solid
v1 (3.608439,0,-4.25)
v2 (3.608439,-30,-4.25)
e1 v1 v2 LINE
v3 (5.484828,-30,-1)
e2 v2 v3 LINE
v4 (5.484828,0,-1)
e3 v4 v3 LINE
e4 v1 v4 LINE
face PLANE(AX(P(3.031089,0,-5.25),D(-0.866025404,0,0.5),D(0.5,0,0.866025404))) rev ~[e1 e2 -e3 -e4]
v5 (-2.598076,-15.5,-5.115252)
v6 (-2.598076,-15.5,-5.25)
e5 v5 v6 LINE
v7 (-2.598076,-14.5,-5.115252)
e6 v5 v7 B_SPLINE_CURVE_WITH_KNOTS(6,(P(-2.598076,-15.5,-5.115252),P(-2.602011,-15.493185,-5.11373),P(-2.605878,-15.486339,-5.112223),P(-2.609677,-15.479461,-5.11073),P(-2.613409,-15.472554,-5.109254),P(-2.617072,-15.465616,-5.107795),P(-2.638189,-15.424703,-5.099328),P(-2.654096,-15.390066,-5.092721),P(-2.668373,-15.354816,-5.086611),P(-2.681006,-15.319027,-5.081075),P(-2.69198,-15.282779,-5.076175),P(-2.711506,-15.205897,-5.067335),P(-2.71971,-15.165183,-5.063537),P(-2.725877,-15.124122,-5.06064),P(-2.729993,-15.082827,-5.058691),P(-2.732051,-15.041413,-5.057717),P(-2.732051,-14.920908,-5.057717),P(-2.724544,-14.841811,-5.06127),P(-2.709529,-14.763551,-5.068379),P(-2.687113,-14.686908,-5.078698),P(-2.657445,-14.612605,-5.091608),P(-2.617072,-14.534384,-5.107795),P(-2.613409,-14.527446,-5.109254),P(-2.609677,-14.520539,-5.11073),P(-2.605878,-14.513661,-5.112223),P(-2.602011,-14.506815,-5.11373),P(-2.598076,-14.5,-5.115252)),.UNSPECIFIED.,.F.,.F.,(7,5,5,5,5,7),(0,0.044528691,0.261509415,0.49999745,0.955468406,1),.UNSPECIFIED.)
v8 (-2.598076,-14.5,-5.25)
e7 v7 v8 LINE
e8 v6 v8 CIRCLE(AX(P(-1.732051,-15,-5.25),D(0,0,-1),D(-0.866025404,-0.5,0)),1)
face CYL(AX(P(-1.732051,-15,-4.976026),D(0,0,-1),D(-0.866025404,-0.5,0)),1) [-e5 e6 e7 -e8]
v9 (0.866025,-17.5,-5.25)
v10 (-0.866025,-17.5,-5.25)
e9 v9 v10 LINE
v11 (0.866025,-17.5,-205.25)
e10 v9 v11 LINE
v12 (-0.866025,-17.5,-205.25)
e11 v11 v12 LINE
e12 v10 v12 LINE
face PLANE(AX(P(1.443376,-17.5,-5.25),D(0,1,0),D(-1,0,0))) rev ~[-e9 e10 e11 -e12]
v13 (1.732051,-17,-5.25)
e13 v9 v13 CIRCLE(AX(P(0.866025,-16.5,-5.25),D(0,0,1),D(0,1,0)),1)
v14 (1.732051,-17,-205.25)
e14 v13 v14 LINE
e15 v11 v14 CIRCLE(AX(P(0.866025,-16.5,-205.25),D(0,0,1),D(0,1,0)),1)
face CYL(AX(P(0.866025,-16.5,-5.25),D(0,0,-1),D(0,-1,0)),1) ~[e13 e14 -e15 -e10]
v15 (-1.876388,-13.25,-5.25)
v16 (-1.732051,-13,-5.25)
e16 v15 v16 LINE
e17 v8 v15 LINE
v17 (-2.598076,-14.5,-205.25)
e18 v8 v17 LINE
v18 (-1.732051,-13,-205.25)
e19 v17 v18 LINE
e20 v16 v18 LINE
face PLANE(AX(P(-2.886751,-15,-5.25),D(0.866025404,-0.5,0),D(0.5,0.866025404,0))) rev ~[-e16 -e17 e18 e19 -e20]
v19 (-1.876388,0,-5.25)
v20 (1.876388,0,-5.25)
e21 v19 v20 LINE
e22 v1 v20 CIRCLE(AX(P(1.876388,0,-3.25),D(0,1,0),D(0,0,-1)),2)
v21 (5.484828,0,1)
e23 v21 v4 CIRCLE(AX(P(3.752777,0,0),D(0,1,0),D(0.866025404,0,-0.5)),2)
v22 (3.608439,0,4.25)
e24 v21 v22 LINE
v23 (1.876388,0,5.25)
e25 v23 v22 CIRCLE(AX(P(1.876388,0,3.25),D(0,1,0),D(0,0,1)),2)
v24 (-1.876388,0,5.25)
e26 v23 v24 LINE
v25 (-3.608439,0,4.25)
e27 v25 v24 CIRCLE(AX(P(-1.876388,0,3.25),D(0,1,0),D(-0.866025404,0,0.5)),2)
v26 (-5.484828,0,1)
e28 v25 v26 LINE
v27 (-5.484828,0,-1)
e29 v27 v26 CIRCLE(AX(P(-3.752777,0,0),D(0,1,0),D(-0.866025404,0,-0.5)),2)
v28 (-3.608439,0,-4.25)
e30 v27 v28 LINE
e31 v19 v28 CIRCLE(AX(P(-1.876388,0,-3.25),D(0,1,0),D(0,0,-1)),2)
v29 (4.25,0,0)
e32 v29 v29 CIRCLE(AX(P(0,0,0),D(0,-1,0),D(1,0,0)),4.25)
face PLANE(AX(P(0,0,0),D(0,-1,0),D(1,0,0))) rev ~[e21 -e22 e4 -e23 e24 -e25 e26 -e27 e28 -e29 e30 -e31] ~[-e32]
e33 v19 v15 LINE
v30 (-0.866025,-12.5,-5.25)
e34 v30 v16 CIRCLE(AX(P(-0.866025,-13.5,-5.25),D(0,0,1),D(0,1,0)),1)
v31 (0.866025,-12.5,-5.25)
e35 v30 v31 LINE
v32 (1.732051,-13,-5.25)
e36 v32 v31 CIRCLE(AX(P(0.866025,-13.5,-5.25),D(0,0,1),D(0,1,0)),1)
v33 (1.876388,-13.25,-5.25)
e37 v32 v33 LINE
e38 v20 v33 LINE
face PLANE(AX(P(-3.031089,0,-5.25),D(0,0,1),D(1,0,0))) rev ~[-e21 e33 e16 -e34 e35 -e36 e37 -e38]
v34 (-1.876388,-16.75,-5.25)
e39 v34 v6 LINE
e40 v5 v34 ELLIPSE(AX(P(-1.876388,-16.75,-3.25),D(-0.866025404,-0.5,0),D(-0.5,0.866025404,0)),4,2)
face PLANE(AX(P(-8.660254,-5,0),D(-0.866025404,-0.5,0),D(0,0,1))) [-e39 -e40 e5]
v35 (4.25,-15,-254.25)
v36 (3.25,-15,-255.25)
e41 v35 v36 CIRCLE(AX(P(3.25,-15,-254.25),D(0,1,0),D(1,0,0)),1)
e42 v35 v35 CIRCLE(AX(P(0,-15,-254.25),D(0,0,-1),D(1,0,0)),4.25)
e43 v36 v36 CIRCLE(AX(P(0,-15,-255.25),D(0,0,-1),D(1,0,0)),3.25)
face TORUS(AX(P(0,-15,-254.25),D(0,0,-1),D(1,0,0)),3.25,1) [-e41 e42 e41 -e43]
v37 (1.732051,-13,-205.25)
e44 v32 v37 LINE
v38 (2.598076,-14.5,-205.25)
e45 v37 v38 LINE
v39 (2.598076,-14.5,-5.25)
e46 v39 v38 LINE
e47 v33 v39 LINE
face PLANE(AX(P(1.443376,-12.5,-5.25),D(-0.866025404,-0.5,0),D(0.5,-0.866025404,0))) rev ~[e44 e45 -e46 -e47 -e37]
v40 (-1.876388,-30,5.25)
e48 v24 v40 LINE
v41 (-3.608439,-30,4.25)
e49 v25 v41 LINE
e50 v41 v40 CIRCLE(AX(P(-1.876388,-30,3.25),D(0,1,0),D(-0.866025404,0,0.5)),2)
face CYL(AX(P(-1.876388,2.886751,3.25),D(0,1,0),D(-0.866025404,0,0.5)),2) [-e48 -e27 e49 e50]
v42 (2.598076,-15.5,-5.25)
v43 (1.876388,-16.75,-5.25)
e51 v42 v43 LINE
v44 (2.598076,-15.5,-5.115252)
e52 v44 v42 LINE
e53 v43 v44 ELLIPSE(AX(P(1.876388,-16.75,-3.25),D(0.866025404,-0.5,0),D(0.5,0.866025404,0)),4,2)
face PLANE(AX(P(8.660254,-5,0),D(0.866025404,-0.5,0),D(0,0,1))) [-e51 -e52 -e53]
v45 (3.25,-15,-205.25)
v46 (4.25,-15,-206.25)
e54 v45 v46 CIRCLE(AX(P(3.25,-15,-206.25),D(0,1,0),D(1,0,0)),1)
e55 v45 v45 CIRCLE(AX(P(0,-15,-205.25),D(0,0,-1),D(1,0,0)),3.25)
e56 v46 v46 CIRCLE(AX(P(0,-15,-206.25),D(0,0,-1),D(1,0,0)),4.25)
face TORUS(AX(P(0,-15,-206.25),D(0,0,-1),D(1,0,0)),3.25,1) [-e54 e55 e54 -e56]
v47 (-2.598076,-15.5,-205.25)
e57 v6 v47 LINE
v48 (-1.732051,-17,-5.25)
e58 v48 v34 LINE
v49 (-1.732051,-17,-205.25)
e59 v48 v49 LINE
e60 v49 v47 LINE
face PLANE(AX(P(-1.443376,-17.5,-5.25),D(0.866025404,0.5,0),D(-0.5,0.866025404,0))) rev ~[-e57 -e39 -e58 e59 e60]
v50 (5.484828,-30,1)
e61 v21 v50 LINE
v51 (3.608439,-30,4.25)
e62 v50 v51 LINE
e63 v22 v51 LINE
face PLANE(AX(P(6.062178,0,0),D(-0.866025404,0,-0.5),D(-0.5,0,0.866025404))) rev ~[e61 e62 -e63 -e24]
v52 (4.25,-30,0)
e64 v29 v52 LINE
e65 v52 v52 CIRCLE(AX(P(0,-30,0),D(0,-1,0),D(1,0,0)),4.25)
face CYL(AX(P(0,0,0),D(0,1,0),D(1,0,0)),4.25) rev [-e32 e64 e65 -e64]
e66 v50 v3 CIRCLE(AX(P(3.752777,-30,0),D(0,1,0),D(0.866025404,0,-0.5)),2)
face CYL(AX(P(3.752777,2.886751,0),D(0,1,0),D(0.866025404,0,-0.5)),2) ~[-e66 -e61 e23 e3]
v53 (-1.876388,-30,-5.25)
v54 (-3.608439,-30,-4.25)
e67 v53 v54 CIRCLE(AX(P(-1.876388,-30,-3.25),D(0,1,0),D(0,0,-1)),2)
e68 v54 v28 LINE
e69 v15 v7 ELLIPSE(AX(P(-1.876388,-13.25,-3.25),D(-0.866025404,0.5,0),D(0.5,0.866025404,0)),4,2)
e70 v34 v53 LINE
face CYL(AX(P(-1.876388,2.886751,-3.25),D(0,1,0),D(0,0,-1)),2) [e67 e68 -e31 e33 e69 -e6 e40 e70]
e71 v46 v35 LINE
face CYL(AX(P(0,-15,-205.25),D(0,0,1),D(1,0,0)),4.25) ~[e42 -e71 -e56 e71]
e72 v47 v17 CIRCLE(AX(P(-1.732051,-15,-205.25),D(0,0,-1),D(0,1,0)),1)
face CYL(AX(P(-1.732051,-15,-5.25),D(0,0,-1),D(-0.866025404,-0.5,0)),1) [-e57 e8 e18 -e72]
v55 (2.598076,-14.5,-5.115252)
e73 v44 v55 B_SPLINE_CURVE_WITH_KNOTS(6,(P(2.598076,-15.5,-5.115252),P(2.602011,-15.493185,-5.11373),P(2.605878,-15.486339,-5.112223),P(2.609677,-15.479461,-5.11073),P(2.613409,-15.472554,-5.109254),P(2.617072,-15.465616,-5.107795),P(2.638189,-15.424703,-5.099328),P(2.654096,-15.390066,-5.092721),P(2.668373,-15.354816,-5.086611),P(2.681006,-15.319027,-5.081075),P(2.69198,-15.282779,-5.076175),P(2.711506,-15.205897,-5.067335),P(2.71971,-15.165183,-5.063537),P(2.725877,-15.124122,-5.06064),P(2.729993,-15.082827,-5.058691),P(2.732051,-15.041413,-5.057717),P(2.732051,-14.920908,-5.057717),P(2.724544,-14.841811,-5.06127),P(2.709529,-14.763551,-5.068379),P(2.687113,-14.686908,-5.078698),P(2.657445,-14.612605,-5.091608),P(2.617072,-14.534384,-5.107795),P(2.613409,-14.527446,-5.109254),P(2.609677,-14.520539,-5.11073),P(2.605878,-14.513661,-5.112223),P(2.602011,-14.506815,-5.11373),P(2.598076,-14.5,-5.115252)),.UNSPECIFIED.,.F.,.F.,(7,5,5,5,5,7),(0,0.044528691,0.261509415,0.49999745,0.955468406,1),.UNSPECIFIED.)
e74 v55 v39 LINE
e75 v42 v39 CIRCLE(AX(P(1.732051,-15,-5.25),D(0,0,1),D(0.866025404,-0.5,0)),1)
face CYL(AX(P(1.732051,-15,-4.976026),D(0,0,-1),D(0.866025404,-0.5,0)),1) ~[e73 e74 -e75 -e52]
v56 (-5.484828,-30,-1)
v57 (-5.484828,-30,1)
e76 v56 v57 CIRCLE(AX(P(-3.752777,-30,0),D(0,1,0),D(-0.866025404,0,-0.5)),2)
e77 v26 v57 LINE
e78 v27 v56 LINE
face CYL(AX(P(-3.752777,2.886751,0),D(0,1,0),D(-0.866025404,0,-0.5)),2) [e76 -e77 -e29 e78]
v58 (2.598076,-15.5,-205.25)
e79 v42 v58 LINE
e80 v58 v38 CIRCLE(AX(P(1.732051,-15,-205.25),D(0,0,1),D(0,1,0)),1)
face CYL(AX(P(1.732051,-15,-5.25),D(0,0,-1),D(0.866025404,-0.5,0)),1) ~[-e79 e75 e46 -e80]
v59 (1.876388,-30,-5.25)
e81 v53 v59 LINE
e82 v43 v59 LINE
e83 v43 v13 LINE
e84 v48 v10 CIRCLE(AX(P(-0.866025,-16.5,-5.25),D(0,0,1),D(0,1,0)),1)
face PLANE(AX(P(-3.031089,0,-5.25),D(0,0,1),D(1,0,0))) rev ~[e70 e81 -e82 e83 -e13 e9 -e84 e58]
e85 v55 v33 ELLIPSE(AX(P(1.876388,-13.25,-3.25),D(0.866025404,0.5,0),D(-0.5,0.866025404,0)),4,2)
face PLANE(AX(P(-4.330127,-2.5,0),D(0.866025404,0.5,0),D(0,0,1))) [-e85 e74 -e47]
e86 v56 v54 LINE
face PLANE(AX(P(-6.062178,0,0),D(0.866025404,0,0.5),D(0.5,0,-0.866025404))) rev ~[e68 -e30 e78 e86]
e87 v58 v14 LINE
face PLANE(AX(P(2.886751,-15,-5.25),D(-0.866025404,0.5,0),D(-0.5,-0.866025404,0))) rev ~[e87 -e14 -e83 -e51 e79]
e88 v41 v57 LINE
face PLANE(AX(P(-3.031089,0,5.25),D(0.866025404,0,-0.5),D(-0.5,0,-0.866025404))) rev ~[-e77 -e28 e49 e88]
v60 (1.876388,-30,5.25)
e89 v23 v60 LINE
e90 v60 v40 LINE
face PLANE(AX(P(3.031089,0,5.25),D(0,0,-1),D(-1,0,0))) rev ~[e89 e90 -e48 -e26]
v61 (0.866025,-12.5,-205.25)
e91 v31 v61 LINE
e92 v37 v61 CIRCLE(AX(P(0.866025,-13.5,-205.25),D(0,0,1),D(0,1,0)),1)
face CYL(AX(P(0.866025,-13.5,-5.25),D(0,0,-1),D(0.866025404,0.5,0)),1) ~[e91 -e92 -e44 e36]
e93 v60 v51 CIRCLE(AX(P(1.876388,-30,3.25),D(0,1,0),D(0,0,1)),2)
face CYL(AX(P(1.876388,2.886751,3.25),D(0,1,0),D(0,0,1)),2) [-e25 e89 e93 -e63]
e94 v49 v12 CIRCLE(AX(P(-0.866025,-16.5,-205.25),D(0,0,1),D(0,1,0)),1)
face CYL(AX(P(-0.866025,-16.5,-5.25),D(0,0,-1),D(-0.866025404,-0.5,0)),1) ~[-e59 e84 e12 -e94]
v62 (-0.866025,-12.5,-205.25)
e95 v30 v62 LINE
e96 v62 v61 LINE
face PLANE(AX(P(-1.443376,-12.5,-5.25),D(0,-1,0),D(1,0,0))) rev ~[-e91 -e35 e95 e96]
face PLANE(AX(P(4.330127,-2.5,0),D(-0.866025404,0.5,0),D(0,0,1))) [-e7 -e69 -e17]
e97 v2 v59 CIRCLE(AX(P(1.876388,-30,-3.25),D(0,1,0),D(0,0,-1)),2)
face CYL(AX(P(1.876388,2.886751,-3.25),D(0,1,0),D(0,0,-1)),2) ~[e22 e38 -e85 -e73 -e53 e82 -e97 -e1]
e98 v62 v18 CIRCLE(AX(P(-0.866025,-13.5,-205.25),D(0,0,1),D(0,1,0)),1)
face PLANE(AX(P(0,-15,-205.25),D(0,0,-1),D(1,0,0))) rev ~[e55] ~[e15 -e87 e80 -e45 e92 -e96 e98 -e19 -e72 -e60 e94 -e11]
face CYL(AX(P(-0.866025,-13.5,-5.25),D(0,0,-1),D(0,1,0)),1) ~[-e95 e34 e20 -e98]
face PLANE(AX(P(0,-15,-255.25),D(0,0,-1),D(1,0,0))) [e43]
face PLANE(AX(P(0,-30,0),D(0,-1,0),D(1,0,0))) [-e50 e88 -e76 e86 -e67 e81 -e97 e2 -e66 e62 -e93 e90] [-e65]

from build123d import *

# Parameters (mm, degrees)
F0_R         = 4.25
F1_DEPTH     = 30
F3_DEPTH     = 200
F4_R         = 4.25
F5_DEPTH     = 50
F6_T1_DEPTH  = 35.7735026919
F6_T6_DEPTH  = 35.7735026919
F6_T12_DEPTH = 35.7735026919
F6_T18_DEPTH = 35.7735026919
F6_T24_DEPTH = 35.7735026919
F6_T30_DEPTH = 35.7735026919
F6_T36_DEPTH = 35.7735026919
F7_R         = 1
F8_R         = 1


# Not quite as in the source:
# - a fillet or chamfer that OpenCascade refuses, or shapes differently, is made with other operations: its cross-section is extruded or revolved along the edge and cut away or added


with BuildPart() as f1:
    # F0 (on Front) → F1 (new body)
    with BuildSketch(Plane.XZ):
        Polygon((3.0310889132, 5.25), (-3.0310889132, 5.25), (-6.0621778265, 0), (-3.0310889132, -5.25), (3.0310889132, -5.25), (6.0621778265, 0), align=None)
        Circle(F0_R, mode=Mode.SUBTRACT)
    extrude(amount=F1_DEPTH)

    # F2 (on face) → F3 (join)
    with BuildSketch(Plane(origin=(0, 0, -5.25), x_dir=(1, 0, 0), z_dir=(0, 0, -1))):
        Polygon((-1.443375673, 12.5), (0, 12.5), (1.443375673, 12.5), (2.8867513459, 15), (1.443375673, 17.5), (-1.443375673, 17.5), (-2.8867513459, 15), align=None)
    extrude(amount=F3_DEPTH)

    # F4 (on face) → F5 (join)
    with BuildSketch(Plane(origin=(0, 0, -205.25), x_dir=(1, 0, 0), z_dir=(0, 0, -1))):
        with Locations((0, 15)):
            Circle(F4_R)
        Polygon((-1.443375673, 12.5), (-2.8867513459, 15), (-1.443375673, 17.5), (1.443375673, 17.5), (2.8867513459, 15), (1.443375673, 12.5), align=None, mode=Mode.SUBTRACT)
        Polygon((-1.443375673, 17.5), (-2.8867513459, 15), (-1.443375673, 12.5), (1.443375673, 12.5), (2.8867513459, 15), (1.443375673, 17.5), align=None)
    extrude(amount=F5_DEPTH)

    # F6: fillet of radius 2 on 6 edges, made by hand

    # F6_s2 → F6_t1 (cut)
    with BuildSketch(Plane.XZ.offset(-2.8867513459)):
        with BuildLine():
            ThreePointArc((5.4848275573, -1), (5.7527767497, 0), (5.4848275573, 1))
            Line((5.4848275573, 1), (6.0621778265, 0))
            Line((6.0621778265, 0), (5.4848275573, -1))
        make_face()
        with BuildLine():
            ThreePointArc((1.8763883749, 5.25), (2.8763883749, 4.9820508076), (3.6084391824, 4.25))
            Line((3.6084391824, 4.25), (3.0310889132, 5.25))
            Line((3.0310889132, 5.25), (1.8763883749, 5.25))
        make_face()
        with BuildLine():
            ThreePointArc((-3.6084391824, 4.25), (-2.8763883749, 4.9820508076), (-1.8763883749, 5.25))
            Line((-1.8763883749, 5.25), (-3.0310889132, 5.25))
            Line((-3.0310889132, 5.25), (-3.6084391824, 4.25))
        make_face()
        with BuildLine():
            ThreePointArc((-5.4848275573, -1), (-5.7527767497, 0), (-5.4848275573, 1))
            Line((-5.4848275573, 1), (-6.0621778265, 0))
            Line((-6.0621778265, 0), (-5.4848275573, -1))
        make_face()
    extrude(amount=F6_T1_DEPTH, mode=Mode.SUBTRACT)


with BuildPart() as f6_tool4:
    # F6_s5 → F6_t6 (new body)
    with BuildSketch(Plane.XZ.offset(-2.8867513459)):
        with BuildLine():
            ThreePointArc((1.8763883749, -5.25), (2.8763883749, -4.9820508076), (3.6084391824, -4.25))
            Line((3.6084391824, -4.25), (3.0310889132, -5.25))
            Line((3.0310889132, -5.25), (1.8763883749, -5.25))
        make_face()
    extrude(amount=F6_T6_DEPTH)

    split(bisect_by=Plane(origin=(-4.3301270189, -2.5, 0), x_dir=(0, 0, 1), z_dir=(0.8660254038, 0.5, 0)), keep=Keep.TOP)

    split(bisect_by=Plane(origin=(8.6602540378, -5, 0), x_dir=(0, 0, 1), z_dir=(-0.8660254038, 0.5, 0)), keep=Keep.TOP)


with BuildPart() as f1_1:
    add(f1.part)

    # F6_t3: cut F6_tool4
    add(f6_tool4.part, mode=Mode.SUBTRACT)


with BuildPart() as f6_tool10:
    # F6_s11 → F6_t12 (new body)
    with BuildSketch(Plane.XZ.offset(-2.8867513459)):
        with BuildLine():
            ThreePointArc((1.8763883749, -5.25), (2.8763883749, -4.9820508076), (3.6084391824, -4.25))
            Line((3.6084391824, -4.25), (3.0310889132, -5.25))
            Line((3.0310889132, -5.25), (1.8763883749, -5.25))
        make_face()
    extrude(amount=F6_T12_DEPTH)

    split(bisect_by=Plane(origin=(-4.3301270189, -2.5, 0), x_dir=(0, 0, 1), z_dir=(0.8660254038, 0.5, 0)), keep=Keep.TOP)

    split(bisect_by=Plane(origin=(8.6602540378, -5, 0), x_dir=(0, 0, 1), z_dir=(0.8660254038, -0.5, 0)), keep=Keep.TOP)


with BuildPart() as f1_2:
    add(f1_1.part)

    # F6_t9: cut F6_tool10
    add(f6_tool10.part, mode=Mode.SUBTRACT)


with BuildPart() as f6_tool16:
    # F6_s17 → F6_t18 (new body)
    with BuildSketch(Plane.XZ.offset(-2.8867513459)):
        with BuildLine():
            ThreePointArc((1.8763883749, -5.25), (2.8763883749, -4.9820508076), (3.6084391824, -4.25))
            Line((3.6084391824, -4.25), (3.0310889132, -5.25))
            Line((3.0310889132, -5.25), (1.8763883749, -5.25))
        make_face()
    extrude(amount=F6_T18_DEPTH)

    split(bisect_by=Plane(origin=(-4.3301270189, -2.5, 0), x_dir=(0, 0, 1), z_dir=(-0.8660254038, -0.5, 0)), keep=Keep.TOP)

    split(bisect_by=Plane(origin=(8.6602540378, -5, 0), x_dir=(0, 0, 1), z_dir=(0.8660254038, -0.5, 0)), keep=Keep.TOP)


with BuildPart() as f1_3:
    add(f1_2.part)

    # F6_t15: cut F6_tool16
    add(f6_tool16.part, mode=Mode.SUBTRACT)


with BuildPart() as f6_tool22:
    # F6_s23 → F6_t24 (new body)
    with BuildSketch(Plane.XZ.offset(-2.8867513459)):
        with BuildLine():
            ThreePointArc((-1.8763883749, -5.25), (-2.8763883749, -4.9820508076), (-3.6084391824, -4.25))
            Line((-3.6084391824, -4.25), (-3.0310889132, -5.25))
            Line((-3.0310889132, -5.25), (-1.8763883749, -5.25))
        make_face()
    extrude(amount=F6_T24_DEPTH)

    split(bisect_by=Plane(origin=(-8.6602540378, -5, 0), x_dir=(0, 0, 1), z_dir=(0.8660254038, 0.5, 0)), keep=Keep.TOP)

    split(bisect_by=Plane(origin=(4.3301270189, -2.5, 0), x_dir=(0, 0, 1), z_dir=(-0.8660254038, 0.5, 0)), keep=Keep.TOP)


with BuildPart() as f1_4:
    add(f1_3.part)

    # F6_t21: cut F6_tool22
    add(f6_tool22.part, mode=Mode.SUBTRACT)


with BuildPart() as f6_tool28:
    # F6_s29 → F6_t30 (new body)
    with BuildSketch(Plane.XZ.offset(-2.8867513459)):
        with BuildLine():
            ThreePointArc((-1.8763883749, -5.25), (-2.8763883749, -4.9820508076), (-3.6084391824, -4.25))
            Line((-3.6084391824, -4.25), (-3.0310889132, -5.25))
            Line((-3.0310889132, -5.25), (-1.8763883749, -5.25))
        make_face()
    extrude(amount=F6_T30_DEPTH)

    split(bisect_by=Plane(origin=(-8.6602540378, -5, 0), x_dir=(0, 0, 1), z_dir=(-0.8660254038, -0.5, 0)), keep=Keep.TOP)

    split(bisect_by=Plane(origin=(4.3301270189, -2.5, 0), x_dir=(0, 0, 1), z_dir=(-0.8660254038, 0.5, 0)), keep=Keep.TOP)


with BuildPart() as f1_5:
    add(f1_4.part)

    # F6_t27: cut F6_tool28
    add(f6_tool28.part, mode=Mode.SUBTRACT)


with BuildPart() as f6_tool34:
    # F6_s35 → F6_t36 (new body)
    with BuildSketch(Plane.XZ.offset(-2.8867513459)):
        with BuildLine():
            ThreePointArc((-1.8763883749, -5.25), (-2.8763883749, -4.9820508076), (-3.6084391824, -4.25))
            Line((-3.6084391824, -4.25), (-3.0310889132, -5.25))
            Line((-3.0310889132, -5.25), (-1.8763883749, -5.25))
        make_face()
    extrude(amount=F6_T36_DEPTH)

    split(bisect_by=Plane(origin=(-8.6602540378, -5, 0), x_dir=(0, 0, 1), z_dir=(-0.8660254038, -0.5, 0)), keep=Keep.TOP)

    split(bisect_by=Plane(origin=(4.3301270189, -2.5, 0), x_dir=(0, 0, 1), z_dir=(0.8660254038, -0.5, 0)), keep=Keep.TOP)


with BuildPart() as f1_6:
    add(f1_5.part)

    # F6_t33: cut F6_tool34
    add(f6_tool34.part, mode=Mode.SUBTRACT)

    # F7
    f7_edges = [f1_6.edges().sort_by_distance(p)[0] for p in [
        (-1.443376, -17.5, -105.25),
        (1.443376, -17.5, -105.25),
        (-2.886751, -15, -105.113013),
        (-1.443376, -12.5, -105.25),
        (2.886751, -15, -105.113013),
        (1.443376, -12.5, -105.25),
    ]]
    fillet(f7_edges, radius=F7_R)

    # F8
    f8_edges = [f1_6.edges().sort_by_distance(p)[0] for p in [
        (-4.25, -15, -255.25),
        (-4.25, -15, -205.25),
    ]]
    fillet(f8_edges, radius=F8_R)


solid = f1_6.part
